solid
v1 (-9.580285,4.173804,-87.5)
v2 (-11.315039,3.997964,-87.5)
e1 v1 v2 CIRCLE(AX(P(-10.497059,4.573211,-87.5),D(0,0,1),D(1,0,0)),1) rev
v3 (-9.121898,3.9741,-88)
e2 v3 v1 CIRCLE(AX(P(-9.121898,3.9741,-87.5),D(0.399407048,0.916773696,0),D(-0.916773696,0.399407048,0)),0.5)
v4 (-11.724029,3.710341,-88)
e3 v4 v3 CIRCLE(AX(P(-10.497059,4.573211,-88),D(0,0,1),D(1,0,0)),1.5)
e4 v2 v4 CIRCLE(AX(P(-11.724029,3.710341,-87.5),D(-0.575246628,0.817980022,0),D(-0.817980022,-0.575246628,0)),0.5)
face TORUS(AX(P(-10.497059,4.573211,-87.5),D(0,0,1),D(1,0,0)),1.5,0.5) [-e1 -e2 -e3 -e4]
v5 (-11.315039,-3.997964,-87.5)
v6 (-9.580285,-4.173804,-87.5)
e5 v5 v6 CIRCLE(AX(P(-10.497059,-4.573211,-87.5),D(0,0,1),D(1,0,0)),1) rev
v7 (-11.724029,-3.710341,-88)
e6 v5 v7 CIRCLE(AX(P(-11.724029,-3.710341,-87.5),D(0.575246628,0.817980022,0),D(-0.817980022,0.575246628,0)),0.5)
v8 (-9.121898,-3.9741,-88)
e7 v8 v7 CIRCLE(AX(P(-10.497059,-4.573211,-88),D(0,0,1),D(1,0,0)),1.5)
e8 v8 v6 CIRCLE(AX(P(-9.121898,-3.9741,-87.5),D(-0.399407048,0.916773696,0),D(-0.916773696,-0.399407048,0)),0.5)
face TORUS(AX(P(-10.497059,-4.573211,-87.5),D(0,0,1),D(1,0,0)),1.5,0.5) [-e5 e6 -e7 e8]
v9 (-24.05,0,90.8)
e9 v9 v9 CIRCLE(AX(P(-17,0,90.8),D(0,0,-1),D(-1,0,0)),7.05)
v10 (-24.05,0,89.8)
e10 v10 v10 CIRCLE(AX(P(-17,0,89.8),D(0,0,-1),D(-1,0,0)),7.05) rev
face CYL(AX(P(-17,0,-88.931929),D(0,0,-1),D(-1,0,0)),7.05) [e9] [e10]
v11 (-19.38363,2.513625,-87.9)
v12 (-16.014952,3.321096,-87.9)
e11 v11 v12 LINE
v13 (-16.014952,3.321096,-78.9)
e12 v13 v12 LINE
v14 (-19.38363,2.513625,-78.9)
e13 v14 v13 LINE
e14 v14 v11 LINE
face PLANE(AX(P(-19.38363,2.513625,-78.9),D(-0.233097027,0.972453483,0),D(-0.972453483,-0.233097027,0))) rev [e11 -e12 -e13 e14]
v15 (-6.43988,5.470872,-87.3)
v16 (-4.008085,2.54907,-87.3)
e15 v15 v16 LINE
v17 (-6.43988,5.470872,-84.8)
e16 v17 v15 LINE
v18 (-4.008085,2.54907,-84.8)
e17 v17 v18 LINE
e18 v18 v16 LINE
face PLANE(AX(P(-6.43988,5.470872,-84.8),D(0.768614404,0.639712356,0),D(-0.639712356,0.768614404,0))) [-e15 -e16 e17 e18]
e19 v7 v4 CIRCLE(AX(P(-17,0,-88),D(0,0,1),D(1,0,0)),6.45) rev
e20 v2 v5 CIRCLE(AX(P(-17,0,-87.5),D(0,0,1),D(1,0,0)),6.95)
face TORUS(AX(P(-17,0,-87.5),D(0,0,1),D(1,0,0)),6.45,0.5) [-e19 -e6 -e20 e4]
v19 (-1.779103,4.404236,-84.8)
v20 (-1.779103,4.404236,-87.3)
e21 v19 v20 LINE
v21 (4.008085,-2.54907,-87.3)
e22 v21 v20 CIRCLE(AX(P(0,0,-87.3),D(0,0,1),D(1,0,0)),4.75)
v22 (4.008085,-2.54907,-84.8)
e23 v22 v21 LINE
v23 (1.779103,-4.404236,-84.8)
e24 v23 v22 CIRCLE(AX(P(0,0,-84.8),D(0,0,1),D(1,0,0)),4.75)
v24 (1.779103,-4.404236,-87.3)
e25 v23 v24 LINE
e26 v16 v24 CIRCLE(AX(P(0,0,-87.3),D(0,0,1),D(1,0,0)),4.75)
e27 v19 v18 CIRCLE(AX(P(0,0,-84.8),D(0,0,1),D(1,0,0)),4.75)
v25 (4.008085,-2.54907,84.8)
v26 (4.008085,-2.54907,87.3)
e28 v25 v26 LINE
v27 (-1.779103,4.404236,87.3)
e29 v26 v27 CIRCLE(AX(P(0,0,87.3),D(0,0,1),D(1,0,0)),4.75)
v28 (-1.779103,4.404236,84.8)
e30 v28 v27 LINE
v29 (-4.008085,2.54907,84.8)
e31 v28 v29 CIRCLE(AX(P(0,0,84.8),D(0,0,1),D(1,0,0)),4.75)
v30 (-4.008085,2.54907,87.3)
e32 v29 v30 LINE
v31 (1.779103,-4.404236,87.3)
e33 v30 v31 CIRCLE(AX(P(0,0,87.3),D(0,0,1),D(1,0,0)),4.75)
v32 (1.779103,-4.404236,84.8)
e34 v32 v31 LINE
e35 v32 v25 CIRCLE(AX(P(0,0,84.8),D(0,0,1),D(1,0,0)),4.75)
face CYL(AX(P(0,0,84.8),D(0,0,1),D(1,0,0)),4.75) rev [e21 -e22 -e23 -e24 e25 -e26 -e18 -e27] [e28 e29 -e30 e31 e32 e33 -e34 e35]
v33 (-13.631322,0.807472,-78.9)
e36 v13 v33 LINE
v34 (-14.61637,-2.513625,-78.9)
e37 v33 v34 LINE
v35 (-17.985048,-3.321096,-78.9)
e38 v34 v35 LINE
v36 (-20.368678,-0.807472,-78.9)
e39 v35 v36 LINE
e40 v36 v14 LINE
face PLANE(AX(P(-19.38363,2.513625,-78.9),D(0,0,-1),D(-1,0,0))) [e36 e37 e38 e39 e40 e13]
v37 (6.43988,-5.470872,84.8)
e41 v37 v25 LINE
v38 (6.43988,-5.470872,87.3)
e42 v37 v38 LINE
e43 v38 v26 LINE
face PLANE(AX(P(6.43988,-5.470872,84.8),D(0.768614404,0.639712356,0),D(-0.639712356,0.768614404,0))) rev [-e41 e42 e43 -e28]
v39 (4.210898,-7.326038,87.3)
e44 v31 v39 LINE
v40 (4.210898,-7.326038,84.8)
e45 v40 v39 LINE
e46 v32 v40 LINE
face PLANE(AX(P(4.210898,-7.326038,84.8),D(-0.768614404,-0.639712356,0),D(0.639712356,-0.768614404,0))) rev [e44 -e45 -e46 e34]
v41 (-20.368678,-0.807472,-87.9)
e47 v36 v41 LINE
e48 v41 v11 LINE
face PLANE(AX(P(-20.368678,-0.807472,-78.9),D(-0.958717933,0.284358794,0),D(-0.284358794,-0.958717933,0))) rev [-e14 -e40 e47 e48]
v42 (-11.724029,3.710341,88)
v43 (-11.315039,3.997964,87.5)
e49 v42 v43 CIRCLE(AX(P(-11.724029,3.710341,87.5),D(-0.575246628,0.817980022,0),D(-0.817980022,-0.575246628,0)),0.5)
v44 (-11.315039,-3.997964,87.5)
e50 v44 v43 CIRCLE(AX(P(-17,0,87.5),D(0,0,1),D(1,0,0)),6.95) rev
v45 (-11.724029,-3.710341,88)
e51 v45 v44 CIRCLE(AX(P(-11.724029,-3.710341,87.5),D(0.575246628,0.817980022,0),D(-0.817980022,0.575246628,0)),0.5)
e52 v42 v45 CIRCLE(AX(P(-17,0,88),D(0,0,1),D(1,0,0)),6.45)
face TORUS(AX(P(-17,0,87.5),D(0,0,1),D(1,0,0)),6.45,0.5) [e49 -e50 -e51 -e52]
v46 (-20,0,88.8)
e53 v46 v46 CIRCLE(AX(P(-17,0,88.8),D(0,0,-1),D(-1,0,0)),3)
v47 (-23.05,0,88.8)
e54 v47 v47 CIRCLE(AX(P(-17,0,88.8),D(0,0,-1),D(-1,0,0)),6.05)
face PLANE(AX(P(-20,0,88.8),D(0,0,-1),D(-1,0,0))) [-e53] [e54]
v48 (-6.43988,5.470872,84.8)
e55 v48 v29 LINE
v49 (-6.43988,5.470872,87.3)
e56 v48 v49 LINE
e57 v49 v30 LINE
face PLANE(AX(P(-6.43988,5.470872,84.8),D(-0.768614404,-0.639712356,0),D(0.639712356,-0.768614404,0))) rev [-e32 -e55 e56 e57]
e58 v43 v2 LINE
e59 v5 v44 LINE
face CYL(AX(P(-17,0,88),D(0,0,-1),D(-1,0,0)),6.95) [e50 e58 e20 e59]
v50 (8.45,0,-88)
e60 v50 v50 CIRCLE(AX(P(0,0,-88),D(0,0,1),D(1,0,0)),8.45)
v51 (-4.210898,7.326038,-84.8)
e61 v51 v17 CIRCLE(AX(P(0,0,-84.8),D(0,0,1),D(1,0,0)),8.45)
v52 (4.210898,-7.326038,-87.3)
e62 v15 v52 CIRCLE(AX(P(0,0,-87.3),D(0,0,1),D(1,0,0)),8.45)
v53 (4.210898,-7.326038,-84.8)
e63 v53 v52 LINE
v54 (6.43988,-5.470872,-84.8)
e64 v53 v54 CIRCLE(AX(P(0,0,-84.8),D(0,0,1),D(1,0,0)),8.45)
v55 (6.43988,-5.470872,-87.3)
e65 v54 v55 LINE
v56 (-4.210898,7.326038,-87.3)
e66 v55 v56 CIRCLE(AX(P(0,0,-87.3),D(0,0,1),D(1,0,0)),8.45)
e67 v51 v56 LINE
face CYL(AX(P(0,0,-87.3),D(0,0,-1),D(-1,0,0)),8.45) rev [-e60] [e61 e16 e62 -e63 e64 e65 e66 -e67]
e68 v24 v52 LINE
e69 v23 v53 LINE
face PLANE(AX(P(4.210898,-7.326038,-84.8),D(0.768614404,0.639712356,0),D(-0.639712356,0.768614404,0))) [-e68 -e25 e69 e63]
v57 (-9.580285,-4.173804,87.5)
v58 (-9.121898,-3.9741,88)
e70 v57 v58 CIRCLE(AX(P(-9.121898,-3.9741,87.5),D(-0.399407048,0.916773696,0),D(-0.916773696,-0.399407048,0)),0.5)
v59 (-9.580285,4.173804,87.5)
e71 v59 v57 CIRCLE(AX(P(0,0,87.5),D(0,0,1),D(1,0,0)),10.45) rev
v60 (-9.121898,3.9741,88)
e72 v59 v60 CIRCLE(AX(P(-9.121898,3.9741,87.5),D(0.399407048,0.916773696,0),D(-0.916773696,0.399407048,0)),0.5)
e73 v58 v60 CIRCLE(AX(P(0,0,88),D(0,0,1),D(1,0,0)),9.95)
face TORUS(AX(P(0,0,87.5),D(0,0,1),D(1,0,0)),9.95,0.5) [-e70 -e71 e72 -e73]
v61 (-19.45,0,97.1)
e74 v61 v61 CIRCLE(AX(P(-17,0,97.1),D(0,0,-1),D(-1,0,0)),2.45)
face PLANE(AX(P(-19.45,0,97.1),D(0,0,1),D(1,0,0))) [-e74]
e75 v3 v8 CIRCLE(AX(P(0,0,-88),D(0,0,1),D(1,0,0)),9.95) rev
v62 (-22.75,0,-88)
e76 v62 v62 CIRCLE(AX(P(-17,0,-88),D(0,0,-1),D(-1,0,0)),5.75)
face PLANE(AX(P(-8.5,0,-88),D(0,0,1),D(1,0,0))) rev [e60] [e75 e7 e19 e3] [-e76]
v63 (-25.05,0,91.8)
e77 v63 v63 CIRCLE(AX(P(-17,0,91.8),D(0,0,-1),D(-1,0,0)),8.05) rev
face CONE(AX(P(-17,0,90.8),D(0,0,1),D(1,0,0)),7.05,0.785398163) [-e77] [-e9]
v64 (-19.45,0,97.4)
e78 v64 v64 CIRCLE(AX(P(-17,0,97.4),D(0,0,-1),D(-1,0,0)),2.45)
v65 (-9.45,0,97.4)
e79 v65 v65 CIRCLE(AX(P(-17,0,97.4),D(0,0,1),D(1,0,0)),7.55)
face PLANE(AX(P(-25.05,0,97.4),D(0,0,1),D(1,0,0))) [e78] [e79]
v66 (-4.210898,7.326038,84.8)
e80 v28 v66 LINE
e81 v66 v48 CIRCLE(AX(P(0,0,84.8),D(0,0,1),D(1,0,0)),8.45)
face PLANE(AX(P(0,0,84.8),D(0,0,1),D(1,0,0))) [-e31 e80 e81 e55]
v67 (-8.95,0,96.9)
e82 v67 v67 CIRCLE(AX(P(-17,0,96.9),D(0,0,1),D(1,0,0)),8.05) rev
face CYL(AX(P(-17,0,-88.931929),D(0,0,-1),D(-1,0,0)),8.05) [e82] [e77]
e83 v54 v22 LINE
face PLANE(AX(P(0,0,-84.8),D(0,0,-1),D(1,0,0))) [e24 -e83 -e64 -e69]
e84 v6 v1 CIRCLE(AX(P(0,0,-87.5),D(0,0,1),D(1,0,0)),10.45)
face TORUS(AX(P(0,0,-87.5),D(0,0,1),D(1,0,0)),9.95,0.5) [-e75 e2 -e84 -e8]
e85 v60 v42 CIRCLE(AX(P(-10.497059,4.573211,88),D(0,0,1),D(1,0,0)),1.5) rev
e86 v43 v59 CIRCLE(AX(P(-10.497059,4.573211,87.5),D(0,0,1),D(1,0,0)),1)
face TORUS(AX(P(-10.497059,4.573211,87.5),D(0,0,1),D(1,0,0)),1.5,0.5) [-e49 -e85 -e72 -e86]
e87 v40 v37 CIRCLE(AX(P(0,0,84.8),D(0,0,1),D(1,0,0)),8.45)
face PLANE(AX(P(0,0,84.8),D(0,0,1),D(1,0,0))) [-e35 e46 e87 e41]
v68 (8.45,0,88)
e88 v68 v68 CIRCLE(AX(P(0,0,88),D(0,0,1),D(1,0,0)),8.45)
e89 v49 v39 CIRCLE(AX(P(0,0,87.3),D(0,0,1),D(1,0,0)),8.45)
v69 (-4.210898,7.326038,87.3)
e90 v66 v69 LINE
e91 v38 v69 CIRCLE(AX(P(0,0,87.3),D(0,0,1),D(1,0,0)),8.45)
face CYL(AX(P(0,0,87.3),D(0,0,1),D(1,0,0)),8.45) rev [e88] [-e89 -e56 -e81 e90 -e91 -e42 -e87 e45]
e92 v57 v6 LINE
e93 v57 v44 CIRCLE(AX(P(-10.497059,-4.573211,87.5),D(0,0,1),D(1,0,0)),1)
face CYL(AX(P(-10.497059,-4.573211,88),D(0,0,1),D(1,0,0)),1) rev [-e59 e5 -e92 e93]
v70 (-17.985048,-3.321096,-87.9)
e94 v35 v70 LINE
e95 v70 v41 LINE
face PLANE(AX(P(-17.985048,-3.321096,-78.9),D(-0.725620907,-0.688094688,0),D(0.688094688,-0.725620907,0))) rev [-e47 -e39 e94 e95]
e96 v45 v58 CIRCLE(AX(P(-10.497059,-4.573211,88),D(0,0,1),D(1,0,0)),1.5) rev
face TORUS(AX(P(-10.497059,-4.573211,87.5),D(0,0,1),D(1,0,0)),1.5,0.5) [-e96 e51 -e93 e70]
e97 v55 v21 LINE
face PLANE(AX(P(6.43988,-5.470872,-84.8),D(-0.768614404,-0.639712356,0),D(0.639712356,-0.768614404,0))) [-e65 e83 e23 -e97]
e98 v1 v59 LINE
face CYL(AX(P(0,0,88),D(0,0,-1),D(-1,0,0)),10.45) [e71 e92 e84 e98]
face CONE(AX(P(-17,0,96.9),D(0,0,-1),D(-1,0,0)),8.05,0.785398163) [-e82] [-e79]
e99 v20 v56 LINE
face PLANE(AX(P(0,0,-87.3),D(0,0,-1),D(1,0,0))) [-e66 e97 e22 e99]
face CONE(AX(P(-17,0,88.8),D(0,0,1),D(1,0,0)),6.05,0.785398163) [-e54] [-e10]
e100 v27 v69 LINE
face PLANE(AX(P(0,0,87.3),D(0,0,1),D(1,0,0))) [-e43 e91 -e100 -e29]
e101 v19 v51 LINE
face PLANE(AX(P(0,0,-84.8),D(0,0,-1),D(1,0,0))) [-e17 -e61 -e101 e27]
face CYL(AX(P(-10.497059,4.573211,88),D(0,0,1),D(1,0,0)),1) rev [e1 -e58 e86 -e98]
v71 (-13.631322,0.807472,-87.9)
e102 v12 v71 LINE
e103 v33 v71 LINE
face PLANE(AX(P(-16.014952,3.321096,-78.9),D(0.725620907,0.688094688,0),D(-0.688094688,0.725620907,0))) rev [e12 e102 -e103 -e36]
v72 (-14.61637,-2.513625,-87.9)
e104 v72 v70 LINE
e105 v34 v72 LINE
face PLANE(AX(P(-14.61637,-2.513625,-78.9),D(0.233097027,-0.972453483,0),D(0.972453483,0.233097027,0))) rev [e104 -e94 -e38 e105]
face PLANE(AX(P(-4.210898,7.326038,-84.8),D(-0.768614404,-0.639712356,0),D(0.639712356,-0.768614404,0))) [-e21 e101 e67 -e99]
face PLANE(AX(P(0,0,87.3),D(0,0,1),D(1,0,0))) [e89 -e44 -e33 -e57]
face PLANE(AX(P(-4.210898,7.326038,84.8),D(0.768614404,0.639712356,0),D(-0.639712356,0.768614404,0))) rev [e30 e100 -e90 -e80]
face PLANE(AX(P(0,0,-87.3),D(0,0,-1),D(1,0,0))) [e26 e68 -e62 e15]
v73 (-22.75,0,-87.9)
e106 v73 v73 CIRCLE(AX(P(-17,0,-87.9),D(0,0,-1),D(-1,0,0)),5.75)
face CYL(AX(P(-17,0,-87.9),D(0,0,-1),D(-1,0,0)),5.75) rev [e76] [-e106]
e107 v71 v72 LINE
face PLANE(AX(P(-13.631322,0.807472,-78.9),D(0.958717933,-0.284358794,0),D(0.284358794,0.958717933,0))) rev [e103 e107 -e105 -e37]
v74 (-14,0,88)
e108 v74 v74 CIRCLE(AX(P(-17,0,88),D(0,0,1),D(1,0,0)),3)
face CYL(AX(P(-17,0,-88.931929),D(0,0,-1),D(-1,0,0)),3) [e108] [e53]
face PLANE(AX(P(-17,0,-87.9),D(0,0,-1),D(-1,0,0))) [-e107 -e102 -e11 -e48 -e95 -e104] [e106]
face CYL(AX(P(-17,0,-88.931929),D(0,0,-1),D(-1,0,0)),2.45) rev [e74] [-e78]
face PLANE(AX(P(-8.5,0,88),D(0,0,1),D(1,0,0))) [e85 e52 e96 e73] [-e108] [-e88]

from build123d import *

# Parameters (mm, degrees)
EXTRUDE1_DEPTH = 88
FILLET1_R      = 1
SKETCH4_R      = 8.45
EXTRUDE2_DEPTH = 0.7
EXTRUDE3_DEPTH = 2.5
SKETCH6_R      = 4.75
EXTRUDE4_DEPTH = 84.8
CHAMFER1_SIZE  = 1
CHAMFER2_SIZE  = 0.5
SKETCH7_R      = 5.75
EXTRUDE5_DEPTH = 0.1
EXTRUDE6_DEPTH = 9
FILLET2_R      = 0.5


with BuildPart() as part:
    # Sketch2 → Extrude1 (new, symmetric)
    with BuildSketch(Plane.XY):
        with BuildLine():
            ThreePointArc((-10.291176471, -1.814989491), (10.45, 0), (-10.291176471, 1.814989491))
            ThreePointArc((-10.291176471, 1.814989491), (-23.95, 0), (-10.291176471, -1.814989491))
        make_face()
    extrude(amount=EXTRUDE1_DEPTH, both=True)

    # Fillet1
    fillet1_edges = [part.edges().sort_by_distance(p)[0] for p in [
        (-10.291176471, 1.814989491, 0),
        (-10.291176471, -1.814989491, 0),
    ]]
    fillet(fillet1_edges, radius=FILLET1_R)

    # Sketch3 → Revolve1 (revolve)
    with BuildSketch(Plane(origin=(0, 0, 0), x_dir=(1, 0, 0), z_dir=(0, 1, 0))):
        Polygon((-20, -88), (-20, -88.8), (-24.05, -88.8), (-24.05, -90.8), (-25.05, -90.8), (-25.05, -97.4), (-19.45, -97.4), (-19.45, -97.1), (-17, -97.1), (-17, -88), align=None)
    revolve(axis=Axis((-17, 0, -88.93192935), (0, 0, 1)))

    # Sketch4 → Extrude2 (cut)
    with BuildSketch(Plane.XY.offset(88)):
        Circle(SKETCH4_R)
    extrude2 = extrude(amount=-EXTRUDE2_DEPTH, mode=Mode.SUBTRACT)

    # Sketch5 → Extrude3 (cut)
    with BuildSketch(Plane.XY.offset(87.3)):
        with BuildLine():
            Line((-6.439880123, 5.470872325), (-4.008084609, 2.549069981))
            ThreePointArc((-4.008084609, 2.549069981), (-3.650918419, -3.038633689), (1.779102837, -4.404235813))
            Line((1.779102837, -4.404235813), (4.210898352, -7.326038157))
            ThreePointArc((4.210898352, -7.326038157), (5.405569405, -6.494791714), (6.439880123, -5.470872325))
            Line((6.439880123, -5.470872325), (4.008084609, -2.549069981))
            ThreePointArc((4.008084609, -2.549069981), (3.650918419, 3.038633689), (-1.779102837, 4.404235813))
            Line((-1.779102837, 4.404235813), (-4.210898352, 7.326038157))
            ThreePointArc((-4.210898352, 7.326038157), (-5.405569405, 6.494791714), (-6.439880123, 5.470872325))
        make_face()
    extrude3 = extrude(amount=-EXTRUDE3_DEPTH, mode=Mode.SUBTRACT)

    # Sketch6 → Extrude4 (cut)
    with BuildSketch(Plane.XY.offset(84.8)):
        Circle(SKETCH6_R)
    extrude4 = extrude(amount=-EXTRUDE4_DEPTH, mode=Mode.SUBTRACT)

    # Mirror1: Extrude2, Extrude3, Extrude4 across plane
    add(extrude2.mirror(Plane.XY), mode=Mode.SUBTRACT)
    add(extrude3.mirror(Plane.XY), mode=Mode.SUBTRACT)
    add(extrude4.mirror(Plane.XY), mode=Mode.SUBTRACT)

    # Chamfer1
    chamfer1_edges = [part.edges().sort_by_distance(p)[0] for p in [
        (-9.95, 0, 88.8),
        (-8.95, 0, 90.8),
    ]]
    chamfer(chamfer1_edges, length=CHAMFER1_SIZE - 0.0001)  # a hair under: the kernel refuses the full size

    # Chamfer2
    chamfer2_edges = [part.edges().sort_by_distance(p)[0] for p in [
        (-8.95, 0, 97.4),
    ]]
    chamfer(chamfer2_edges, length=CHAMFER2_SIZE)

    # Sketch7 → Extrude5 (cut)
    with BuildSketch(Plane(origin=(0, 0, -88), x_dir=(-1, 0, 0), z_dir=(0, 0, -1))):
        with Locations((17, 0)):
            Circle(SKETCH7_R)
    extrude(amount=-EXTRUDE5_DEPTH, mode=Mode.SUBTRACT)

    # Sketch8 → Extrude6 (cut)
    with BuildSketch(Plane(origin=(0, 0, -87.9), x_dir=(-1, 0, 0), z_dir=(0, 0, -1))):
        Polygon((19.383629921, 2.513624554), (16.014952241, 3.321096342), (13.63132232, 0.807471788), (14.616370079, -2.513624554), (17.985047759, -3.321096342), (20.36867768, -0.807471788), align=None)
    extrude(amount=-EXTRUDE6_DEPTH, mode=Mode.SUBTRACT)

    # Fillet2
    fillet2_edges = [part.edges().sort_by_distance(p)[0] for p in [
        (-23.95, 0, -88),
        (-23.95, 0, 88),
        (-10.396212718, -3.578308658, -88),
        (-10.396212718, -3.578308658, 88),
        (-10.396212718, 3.578308658, -88),
        (-10.396212718, 3.578308658, 88),
        (10.45, 0, -88),
        (10.45, 0, 88),
    ]]
    fillet(fillet2_edges, radius=FILLET2_R)


solid = part.part
